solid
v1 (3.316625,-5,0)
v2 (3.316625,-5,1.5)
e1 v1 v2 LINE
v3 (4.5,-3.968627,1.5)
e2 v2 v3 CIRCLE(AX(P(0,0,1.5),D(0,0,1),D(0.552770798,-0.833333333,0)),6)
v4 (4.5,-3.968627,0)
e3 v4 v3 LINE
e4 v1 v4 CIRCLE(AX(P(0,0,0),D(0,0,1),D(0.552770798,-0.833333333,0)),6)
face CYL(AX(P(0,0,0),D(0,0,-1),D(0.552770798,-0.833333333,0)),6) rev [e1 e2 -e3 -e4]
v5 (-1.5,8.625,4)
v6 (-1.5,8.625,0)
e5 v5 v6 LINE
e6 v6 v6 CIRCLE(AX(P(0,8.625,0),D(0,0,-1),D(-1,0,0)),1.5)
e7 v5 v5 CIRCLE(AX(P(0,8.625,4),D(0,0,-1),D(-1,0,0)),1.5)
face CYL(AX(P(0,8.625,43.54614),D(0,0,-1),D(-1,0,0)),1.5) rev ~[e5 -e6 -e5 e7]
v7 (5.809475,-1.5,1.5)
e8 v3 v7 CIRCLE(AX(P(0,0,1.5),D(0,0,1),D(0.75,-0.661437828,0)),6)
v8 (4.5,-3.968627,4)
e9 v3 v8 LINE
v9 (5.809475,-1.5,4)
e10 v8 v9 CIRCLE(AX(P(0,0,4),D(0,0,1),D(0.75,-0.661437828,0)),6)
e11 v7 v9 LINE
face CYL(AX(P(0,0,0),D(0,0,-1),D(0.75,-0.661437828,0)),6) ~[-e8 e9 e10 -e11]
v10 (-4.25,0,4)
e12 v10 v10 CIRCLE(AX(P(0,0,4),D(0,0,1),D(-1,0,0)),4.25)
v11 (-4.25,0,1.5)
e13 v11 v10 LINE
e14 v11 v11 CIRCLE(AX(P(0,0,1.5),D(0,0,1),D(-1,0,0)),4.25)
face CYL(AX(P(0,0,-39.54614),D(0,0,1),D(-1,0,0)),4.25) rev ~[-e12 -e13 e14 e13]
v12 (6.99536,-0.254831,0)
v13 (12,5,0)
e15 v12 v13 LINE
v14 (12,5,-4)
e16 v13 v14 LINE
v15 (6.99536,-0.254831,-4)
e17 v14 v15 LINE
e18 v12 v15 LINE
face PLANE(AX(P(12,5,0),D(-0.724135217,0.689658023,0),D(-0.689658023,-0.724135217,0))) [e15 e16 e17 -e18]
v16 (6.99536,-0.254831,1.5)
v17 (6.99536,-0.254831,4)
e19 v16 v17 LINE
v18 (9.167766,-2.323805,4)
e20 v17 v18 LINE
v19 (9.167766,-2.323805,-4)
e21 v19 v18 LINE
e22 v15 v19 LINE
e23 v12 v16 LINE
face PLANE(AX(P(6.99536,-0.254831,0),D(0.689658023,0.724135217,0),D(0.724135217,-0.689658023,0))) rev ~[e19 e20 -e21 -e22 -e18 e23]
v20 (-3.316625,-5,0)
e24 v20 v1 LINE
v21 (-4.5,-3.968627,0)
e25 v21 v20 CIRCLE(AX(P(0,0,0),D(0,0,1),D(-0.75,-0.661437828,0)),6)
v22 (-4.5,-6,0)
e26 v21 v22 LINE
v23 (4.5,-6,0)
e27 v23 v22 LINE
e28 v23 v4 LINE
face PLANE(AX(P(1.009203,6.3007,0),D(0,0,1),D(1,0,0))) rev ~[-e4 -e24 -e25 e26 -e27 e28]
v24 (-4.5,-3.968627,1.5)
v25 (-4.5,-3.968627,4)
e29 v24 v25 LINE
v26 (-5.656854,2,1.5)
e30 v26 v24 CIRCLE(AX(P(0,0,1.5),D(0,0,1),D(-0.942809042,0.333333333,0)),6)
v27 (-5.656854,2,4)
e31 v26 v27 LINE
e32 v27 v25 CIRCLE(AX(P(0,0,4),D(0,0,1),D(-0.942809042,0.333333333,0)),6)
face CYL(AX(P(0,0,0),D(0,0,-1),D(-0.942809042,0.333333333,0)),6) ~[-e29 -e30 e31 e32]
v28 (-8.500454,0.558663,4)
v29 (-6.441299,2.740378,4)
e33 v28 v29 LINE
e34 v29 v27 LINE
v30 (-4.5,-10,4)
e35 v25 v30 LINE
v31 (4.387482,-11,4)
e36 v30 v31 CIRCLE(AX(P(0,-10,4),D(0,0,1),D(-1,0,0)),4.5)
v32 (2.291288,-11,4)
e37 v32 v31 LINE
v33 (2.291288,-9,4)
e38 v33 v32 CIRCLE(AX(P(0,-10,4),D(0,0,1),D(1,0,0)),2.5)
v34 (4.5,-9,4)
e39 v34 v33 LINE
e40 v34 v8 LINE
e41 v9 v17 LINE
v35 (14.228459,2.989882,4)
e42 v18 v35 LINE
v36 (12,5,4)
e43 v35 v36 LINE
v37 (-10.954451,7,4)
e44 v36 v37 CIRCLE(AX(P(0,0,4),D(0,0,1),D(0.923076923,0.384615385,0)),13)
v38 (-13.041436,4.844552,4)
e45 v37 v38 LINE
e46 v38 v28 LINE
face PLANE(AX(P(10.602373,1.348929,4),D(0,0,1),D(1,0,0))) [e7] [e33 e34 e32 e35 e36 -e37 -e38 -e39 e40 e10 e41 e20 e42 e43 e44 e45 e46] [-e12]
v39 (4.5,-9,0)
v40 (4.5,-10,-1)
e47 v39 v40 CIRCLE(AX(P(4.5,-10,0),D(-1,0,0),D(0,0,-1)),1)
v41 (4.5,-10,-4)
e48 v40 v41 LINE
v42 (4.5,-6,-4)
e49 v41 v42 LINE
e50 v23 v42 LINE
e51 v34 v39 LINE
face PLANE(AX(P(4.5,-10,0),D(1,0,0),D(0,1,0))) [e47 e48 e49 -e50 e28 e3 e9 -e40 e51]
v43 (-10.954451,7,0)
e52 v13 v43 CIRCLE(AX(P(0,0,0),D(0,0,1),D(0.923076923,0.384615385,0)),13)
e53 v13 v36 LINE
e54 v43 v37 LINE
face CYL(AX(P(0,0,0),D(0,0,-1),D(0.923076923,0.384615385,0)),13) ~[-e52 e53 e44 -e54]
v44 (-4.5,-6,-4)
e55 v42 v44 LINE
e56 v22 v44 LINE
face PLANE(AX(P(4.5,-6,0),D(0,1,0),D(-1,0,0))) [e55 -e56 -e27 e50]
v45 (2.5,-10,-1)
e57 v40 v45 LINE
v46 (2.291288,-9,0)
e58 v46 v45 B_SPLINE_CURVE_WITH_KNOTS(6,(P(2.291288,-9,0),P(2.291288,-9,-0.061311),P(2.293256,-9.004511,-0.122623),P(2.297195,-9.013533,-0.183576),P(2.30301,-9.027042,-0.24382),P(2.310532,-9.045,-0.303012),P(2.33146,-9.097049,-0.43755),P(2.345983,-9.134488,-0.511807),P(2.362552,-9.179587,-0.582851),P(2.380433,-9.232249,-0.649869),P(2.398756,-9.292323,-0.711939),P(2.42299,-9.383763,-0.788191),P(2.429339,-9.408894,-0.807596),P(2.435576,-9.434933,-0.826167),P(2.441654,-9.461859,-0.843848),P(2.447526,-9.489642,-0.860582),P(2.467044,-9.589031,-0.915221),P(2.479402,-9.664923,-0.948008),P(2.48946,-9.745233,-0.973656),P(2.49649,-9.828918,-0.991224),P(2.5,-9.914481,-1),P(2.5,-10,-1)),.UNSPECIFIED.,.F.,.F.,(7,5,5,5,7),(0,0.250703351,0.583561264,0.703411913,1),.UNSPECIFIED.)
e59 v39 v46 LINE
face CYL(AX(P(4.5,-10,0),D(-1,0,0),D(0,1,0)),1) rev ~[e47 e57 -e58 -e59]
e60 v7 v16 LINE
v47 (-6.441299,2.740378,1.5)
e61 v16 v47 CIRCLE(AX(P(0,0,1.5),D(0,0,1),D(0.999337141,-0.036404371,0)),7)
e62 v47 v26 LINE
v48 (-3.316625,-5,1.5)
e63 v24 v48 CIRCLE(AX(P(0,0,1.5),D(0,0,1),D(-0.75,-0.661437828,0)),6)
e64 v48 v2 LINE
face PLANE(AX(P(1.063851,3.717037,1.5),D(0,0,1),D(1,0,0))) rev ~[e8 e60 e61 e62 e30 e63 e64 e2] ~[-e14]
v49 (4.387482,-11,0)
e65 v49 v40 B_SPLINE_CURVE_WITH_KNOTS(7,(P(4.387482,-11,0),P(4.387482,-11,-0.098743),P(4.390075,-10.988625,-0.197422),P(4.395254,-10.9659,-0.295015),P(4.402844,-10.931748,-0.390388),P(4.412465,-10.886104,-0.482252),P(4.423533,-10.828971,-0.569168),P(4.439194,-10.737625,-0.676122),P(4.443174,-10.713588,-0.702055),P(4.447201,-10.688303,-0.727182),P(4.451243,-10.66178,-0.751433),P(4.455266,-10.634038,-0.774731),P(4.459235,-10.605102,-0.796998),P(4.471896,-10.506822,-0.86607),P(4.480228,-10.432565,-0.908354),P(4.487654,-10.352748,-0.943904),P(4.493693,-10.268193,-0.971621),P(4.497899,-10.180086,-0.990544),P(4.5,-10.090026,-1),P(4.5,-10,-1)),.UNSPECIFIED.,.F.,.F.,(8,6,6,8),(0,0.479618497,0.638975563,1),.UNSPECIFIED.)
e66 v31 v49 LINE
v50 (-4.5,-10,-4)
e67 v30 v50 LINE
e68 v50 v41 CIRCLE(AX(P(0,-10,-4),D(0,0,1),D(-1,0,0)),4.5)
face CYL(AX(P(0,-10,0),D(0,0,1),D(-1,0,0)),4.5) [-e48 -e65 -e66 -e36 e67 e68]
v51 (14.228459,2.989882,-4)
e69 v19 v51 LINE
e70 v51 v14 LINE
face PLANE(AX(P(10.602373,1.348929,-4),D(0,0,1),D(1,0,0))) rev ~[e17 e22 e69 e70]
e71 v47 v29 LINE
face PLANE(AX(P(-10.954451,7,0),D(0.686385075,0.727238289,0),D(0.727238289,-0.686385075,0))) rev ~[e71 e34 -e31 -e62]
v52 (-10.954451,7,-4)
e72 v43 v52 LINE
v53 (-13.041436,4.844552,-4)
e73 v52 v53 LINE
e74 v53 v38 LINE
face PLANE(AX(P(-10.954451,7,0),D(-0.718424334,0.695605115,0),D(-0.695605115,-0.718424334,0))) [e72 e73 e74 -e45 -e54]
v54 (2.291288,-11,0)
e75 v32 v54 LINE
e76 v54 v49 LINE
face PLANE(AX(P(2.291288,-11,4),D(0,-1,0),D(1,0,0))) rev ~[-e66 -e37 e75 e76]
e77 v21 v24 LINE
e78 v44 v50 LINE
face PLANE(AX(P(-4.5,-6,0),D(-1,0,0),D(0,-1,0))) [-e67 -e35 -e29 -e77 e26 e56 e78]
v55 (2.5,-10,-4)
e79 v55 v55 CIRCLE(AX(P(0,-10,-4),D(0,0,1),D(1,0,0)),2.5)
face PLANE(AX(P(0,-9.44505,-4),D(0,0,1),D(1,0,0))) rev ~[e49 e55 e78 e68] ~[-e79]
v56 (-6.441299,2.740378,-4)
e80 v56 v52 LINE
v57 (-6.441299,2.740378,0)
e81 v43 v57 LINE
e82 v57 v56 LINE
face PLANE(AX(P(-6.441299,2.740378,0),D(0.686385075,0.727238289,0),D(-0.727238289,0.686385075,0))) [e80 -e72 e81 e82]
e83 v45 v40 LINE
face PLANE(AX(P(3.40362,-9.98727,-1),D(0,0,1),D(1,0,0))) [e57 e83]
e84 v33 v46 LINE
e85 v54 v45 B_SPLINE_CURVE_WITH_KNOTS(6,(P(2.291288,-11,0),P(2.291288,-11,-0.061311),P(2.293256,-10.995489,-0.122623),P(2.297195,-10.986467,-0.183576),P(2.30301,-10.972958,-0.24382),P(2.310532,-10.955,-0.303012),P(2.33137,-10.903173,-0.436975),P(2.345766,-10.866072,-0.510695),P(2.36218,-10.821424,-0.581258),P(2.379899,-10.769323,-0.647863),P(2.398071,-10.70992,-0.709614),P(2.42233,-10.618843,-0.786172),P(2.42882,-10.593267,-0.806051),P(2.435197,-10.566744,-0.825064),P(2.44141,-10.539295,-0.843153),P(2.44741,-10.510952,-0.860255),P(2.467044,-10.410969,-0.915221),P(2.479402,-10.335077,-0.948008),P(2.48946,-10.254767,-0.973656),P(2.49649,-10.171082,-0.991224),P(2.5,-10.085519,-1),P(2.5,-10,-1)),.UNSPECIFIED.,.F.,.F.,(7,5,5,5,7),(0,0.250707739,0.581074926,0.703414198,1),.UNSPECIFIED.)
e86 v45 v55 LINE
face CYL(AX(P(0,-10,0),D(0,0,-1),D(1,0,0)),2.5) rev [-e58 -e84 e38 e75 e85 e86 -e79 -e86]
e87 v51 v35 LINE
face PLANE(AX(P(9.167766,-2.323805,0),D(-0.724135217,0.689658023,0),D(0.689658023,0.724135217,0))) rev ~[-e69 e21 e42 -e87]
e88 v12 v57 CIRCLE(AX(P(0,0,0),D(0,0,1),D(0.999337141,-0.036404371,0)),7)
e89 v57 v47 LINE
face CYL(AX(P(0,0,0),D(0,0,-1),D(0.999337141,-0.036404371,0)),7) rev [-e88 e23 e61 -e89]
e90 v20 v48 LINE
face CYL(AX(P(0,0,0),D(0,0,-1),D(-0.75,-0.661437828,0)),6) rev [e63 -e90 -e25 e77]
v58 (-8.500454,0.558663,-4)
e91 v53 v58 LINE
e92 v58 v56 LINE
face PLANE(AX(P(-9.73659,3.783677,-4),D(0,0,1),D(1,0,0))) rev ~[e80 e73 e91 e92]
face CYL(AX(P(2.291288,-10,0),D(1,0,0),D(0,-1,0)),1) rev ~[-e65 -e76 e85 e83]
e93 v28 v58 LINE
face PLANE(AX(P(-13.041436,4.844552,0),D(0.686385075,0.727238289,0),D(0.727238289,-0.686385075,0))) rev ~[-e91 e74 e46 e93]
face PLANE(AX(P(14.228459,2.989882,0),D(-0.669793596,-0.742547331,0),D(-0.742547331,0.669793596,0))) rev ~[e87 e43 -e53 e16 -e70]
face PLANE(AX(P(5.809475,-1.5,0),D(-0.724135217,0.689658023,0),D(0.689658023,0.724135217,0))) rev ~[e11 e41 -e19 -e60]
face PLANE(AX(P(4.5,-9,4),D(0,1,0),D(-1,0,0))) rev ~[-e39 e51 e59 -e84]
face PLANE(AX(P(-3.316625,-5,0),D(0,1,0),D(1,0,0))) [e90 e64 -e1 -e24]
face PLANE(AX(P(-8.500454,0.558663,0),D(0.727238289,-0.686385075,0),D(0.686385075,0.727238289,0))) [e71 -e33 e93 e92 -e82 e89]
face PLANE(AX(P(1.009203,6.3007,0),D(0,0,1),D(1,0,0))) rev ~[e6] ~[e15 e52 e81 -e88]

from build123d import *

# Parameters (mm, degrees)
F0_R          = 2.5
F1_DEPTH      = 4
F2_DEPTH      = 4
F4_DEPTH      = 4
F4_DEPTH_BACK = 4
F5_DEPTH      = 1.5
F6_D          = 8.5
F8_DEPTH      = 5
F9_R          = 1
F11_D         = 3


# Not quite as in the source:
# - a feature names something its author has since deleted; it is built from what else it names


with BuildPart() as f1:
    # F0 (on Top) → F1 (new body)
    with BuildSketch(Plane.XY):
        with BuildLine():
            ThreePointArc((-5.6568542495, 2), (1.7516630026, 5.7386127875), (5.8094750193, -1.5))
            Line((5.8094750193, -1.5), (12, 5))
            ThreePointArc((12, 5), (1.1284028976, 12.9509345956), (-10.9544511501, 7))
            Line((-10.9544511501, 7), (-5.6568542495, 2))
        make_face()
        with BuildLine():
            Line((-3.3166247904, -5), (3.3166247904, -5))
            ThreePointArc((3.3166247904, -5), (3.9421870024, -4.5231804782), (4.5, -3.9686269666))
            ThreePointArc((4.5, -3.9686269666), (5.3004573924, -2.8116101137), (5.8094750193, -1.5))
            ThreePointArc((5.8094750193, -1.5), (1.7516630026, 5.7386127875), (-5.6568542495, 2))
            ThreePointArc((-5.6568542495, 2), (-5.8903776643, -1.1416877735), (-4.5, -3.9686269666))
            ThreePointArc((-4.5, -3.9686269666), (-3.9421870024, -4.5231804782), (-3.3166247904, -5))
        make_face()
        with BuildLine():
            ThreePointArc((4.5, -3.9686269666), (3.9421870024, -4.5231804782), (3.3166247904, -5))
            Line((3.3166247904, -5), (-3.3166247904, -5))
            ThreePointArc((-3.3166247904, -5), (-3.9421870024, -4.5231804782), (-4.5, -3.9686269666))
            Line((-4.5, -3.9686269666), (-4.5, -6))
            Line((-4.5, -6), (4.5, -6))
            Line((4.5, -6), (4.5, -3.9686269666))
        make_face()
        with BuildLine():
            Line((4.5, -10), (4.5, -6))
            Line((4.5, -6), (-4.5, -6))
            Line((-4.5, -6), (-4.5, -10))
            ThreePointArc((-4.5, -10), (0, -14.5), (4.5, -10))
        make_face()
        with Locations((0, -10)):
            Circle(F0_R, mode=Mode.SUBTRACT)
    extrude(amount=F1_DEPTH)

    # F0 (on Top) → F2 (join)
    with BuildSketch(Plane.XY):
        with BuildLine():
            Line((4.5, -10), (4.5, -6))
            Line((4.5, -6), (-4.5, -6))
            Line((-4.5, -6), (-4.5, -10))
            ThreePointArc((-4.5, -10), (0, -14.5), (4.5, -10))
        make_face()
        with Locations((0, -10)):
            Circle(F0_R, mode=Mode.SUBTRACT)
    extrude(amount=-F2_DEPTH)

    # F3 (on face) → F4 (join, two sides)
    with BuildSketch(Plane.XY) as f4_sk:
        Polygon((6.9953599884, -0.2548305963), (9.1677656379, -2.3238046642), (14.2284593947, 2.9898819005), (12, 5), align=None)
        Polygon((-8.5004540069, 0.5586628434), (-6.4412987824, 2.7403777105), (-10.9544511501, 7), (-13.0414362661, 4.8445516572), align=None)
    extrude(amount=-F4_DEPTH)
    extrude(f4_sk.sketch, amount=F4_DEPTH_BACK)

    # F3 (on face) → F5 (cut)
    with BuildSketch(Plane.XY):
        with BuildLine():
            Line((5.8094750193, -1.5), (6.9953599884, -0.2548305963))
            ThreePointArc((6.9953599884, -0.2548305963), (1.5230115414, 6.832308237), (-6.4412987824, 2.7403777105))
            Line((-6.4412987824, 2.7403777105), (-5.6568542495, 2))
            ThreePointArc((-5.6568542495, 2), (1.7516630026, 5.7386127875), (5.8094750193, -1.5))
        make_face()
        with BuildLine():
            ThreePointArc((4.5, -3.9686269666), (5.3004573924, -2.8116101137), (5.8094750193, -1.5))
            ThreePointArc((5.8094750193, -1.5), (1.7516630026, 5.7386127875), (-5.6568542495, 2))
            ThreePointArc((-5.6568542495, 2), (-5.8903776643, -1.1416877735), (-4.5, -3.9686269666))
            ThreePointArc((-4.5, -3.9686269666), (-3.9421870024, -4.5231804782), (-3.3166247904, -5))
            Line((-3.3166247904, -5), (3.3166247904, -5))
            ThreePointArc((3.3166247904, -5), (3.9421870024, -4.5231804782), (4.5, -3.9686269666))
        make_face()
    extrude(amount=F5_DEPTH, mode=Mode.SUBTRACT)

    # F6 (through all)
    with Locations(Plane(origin=(0, 0, 0), x_dir=(1, 0, 0), z_dir=(0, 0, -1))):
        with Locations((0, 0)):
            Hole(F6_D / 2)

    # F7 (on face) → F8 (cut)
    with BuildSketch(Plane.XY.offset(4)):
        with BuildLine():
            Line((4.5, -9), (2.2912878475, -9))
            ThreePointArc((2.2912878475, -9), (2.4472657823, -9.4892258908), (2.5, -10))
            ThreePointArc((2.5, -10), (2.4472657823, -10.5107741092), (2.2912878475, -11))
            Line((2.2912878475, -11), (4.3874821937, -11))
            ThreePointArc((4.3874821937, -11), (4.4717820761, -10.5031551095), (4.5, -10))
            Line((4.5, -10), (4.5, -9))
        make_face()
    extrude(amount=-F8_DEPTH, mode=Mode.SUBTRACT)

    # F9
    f9_edges = [f1.edges().sort_by_distance(p)[0] for p in [
        (3.339385, -11, -1),
        (3.395644, -9, -1),
    ]]
    fillet(f9_edges, radius=F9_R)

    # F11 (through all)
    with Locations(Plane.XY.offset(4)):
        with Locations((0, 8.625)):
            Hole(F11_D / 2)


solid = f1.part
